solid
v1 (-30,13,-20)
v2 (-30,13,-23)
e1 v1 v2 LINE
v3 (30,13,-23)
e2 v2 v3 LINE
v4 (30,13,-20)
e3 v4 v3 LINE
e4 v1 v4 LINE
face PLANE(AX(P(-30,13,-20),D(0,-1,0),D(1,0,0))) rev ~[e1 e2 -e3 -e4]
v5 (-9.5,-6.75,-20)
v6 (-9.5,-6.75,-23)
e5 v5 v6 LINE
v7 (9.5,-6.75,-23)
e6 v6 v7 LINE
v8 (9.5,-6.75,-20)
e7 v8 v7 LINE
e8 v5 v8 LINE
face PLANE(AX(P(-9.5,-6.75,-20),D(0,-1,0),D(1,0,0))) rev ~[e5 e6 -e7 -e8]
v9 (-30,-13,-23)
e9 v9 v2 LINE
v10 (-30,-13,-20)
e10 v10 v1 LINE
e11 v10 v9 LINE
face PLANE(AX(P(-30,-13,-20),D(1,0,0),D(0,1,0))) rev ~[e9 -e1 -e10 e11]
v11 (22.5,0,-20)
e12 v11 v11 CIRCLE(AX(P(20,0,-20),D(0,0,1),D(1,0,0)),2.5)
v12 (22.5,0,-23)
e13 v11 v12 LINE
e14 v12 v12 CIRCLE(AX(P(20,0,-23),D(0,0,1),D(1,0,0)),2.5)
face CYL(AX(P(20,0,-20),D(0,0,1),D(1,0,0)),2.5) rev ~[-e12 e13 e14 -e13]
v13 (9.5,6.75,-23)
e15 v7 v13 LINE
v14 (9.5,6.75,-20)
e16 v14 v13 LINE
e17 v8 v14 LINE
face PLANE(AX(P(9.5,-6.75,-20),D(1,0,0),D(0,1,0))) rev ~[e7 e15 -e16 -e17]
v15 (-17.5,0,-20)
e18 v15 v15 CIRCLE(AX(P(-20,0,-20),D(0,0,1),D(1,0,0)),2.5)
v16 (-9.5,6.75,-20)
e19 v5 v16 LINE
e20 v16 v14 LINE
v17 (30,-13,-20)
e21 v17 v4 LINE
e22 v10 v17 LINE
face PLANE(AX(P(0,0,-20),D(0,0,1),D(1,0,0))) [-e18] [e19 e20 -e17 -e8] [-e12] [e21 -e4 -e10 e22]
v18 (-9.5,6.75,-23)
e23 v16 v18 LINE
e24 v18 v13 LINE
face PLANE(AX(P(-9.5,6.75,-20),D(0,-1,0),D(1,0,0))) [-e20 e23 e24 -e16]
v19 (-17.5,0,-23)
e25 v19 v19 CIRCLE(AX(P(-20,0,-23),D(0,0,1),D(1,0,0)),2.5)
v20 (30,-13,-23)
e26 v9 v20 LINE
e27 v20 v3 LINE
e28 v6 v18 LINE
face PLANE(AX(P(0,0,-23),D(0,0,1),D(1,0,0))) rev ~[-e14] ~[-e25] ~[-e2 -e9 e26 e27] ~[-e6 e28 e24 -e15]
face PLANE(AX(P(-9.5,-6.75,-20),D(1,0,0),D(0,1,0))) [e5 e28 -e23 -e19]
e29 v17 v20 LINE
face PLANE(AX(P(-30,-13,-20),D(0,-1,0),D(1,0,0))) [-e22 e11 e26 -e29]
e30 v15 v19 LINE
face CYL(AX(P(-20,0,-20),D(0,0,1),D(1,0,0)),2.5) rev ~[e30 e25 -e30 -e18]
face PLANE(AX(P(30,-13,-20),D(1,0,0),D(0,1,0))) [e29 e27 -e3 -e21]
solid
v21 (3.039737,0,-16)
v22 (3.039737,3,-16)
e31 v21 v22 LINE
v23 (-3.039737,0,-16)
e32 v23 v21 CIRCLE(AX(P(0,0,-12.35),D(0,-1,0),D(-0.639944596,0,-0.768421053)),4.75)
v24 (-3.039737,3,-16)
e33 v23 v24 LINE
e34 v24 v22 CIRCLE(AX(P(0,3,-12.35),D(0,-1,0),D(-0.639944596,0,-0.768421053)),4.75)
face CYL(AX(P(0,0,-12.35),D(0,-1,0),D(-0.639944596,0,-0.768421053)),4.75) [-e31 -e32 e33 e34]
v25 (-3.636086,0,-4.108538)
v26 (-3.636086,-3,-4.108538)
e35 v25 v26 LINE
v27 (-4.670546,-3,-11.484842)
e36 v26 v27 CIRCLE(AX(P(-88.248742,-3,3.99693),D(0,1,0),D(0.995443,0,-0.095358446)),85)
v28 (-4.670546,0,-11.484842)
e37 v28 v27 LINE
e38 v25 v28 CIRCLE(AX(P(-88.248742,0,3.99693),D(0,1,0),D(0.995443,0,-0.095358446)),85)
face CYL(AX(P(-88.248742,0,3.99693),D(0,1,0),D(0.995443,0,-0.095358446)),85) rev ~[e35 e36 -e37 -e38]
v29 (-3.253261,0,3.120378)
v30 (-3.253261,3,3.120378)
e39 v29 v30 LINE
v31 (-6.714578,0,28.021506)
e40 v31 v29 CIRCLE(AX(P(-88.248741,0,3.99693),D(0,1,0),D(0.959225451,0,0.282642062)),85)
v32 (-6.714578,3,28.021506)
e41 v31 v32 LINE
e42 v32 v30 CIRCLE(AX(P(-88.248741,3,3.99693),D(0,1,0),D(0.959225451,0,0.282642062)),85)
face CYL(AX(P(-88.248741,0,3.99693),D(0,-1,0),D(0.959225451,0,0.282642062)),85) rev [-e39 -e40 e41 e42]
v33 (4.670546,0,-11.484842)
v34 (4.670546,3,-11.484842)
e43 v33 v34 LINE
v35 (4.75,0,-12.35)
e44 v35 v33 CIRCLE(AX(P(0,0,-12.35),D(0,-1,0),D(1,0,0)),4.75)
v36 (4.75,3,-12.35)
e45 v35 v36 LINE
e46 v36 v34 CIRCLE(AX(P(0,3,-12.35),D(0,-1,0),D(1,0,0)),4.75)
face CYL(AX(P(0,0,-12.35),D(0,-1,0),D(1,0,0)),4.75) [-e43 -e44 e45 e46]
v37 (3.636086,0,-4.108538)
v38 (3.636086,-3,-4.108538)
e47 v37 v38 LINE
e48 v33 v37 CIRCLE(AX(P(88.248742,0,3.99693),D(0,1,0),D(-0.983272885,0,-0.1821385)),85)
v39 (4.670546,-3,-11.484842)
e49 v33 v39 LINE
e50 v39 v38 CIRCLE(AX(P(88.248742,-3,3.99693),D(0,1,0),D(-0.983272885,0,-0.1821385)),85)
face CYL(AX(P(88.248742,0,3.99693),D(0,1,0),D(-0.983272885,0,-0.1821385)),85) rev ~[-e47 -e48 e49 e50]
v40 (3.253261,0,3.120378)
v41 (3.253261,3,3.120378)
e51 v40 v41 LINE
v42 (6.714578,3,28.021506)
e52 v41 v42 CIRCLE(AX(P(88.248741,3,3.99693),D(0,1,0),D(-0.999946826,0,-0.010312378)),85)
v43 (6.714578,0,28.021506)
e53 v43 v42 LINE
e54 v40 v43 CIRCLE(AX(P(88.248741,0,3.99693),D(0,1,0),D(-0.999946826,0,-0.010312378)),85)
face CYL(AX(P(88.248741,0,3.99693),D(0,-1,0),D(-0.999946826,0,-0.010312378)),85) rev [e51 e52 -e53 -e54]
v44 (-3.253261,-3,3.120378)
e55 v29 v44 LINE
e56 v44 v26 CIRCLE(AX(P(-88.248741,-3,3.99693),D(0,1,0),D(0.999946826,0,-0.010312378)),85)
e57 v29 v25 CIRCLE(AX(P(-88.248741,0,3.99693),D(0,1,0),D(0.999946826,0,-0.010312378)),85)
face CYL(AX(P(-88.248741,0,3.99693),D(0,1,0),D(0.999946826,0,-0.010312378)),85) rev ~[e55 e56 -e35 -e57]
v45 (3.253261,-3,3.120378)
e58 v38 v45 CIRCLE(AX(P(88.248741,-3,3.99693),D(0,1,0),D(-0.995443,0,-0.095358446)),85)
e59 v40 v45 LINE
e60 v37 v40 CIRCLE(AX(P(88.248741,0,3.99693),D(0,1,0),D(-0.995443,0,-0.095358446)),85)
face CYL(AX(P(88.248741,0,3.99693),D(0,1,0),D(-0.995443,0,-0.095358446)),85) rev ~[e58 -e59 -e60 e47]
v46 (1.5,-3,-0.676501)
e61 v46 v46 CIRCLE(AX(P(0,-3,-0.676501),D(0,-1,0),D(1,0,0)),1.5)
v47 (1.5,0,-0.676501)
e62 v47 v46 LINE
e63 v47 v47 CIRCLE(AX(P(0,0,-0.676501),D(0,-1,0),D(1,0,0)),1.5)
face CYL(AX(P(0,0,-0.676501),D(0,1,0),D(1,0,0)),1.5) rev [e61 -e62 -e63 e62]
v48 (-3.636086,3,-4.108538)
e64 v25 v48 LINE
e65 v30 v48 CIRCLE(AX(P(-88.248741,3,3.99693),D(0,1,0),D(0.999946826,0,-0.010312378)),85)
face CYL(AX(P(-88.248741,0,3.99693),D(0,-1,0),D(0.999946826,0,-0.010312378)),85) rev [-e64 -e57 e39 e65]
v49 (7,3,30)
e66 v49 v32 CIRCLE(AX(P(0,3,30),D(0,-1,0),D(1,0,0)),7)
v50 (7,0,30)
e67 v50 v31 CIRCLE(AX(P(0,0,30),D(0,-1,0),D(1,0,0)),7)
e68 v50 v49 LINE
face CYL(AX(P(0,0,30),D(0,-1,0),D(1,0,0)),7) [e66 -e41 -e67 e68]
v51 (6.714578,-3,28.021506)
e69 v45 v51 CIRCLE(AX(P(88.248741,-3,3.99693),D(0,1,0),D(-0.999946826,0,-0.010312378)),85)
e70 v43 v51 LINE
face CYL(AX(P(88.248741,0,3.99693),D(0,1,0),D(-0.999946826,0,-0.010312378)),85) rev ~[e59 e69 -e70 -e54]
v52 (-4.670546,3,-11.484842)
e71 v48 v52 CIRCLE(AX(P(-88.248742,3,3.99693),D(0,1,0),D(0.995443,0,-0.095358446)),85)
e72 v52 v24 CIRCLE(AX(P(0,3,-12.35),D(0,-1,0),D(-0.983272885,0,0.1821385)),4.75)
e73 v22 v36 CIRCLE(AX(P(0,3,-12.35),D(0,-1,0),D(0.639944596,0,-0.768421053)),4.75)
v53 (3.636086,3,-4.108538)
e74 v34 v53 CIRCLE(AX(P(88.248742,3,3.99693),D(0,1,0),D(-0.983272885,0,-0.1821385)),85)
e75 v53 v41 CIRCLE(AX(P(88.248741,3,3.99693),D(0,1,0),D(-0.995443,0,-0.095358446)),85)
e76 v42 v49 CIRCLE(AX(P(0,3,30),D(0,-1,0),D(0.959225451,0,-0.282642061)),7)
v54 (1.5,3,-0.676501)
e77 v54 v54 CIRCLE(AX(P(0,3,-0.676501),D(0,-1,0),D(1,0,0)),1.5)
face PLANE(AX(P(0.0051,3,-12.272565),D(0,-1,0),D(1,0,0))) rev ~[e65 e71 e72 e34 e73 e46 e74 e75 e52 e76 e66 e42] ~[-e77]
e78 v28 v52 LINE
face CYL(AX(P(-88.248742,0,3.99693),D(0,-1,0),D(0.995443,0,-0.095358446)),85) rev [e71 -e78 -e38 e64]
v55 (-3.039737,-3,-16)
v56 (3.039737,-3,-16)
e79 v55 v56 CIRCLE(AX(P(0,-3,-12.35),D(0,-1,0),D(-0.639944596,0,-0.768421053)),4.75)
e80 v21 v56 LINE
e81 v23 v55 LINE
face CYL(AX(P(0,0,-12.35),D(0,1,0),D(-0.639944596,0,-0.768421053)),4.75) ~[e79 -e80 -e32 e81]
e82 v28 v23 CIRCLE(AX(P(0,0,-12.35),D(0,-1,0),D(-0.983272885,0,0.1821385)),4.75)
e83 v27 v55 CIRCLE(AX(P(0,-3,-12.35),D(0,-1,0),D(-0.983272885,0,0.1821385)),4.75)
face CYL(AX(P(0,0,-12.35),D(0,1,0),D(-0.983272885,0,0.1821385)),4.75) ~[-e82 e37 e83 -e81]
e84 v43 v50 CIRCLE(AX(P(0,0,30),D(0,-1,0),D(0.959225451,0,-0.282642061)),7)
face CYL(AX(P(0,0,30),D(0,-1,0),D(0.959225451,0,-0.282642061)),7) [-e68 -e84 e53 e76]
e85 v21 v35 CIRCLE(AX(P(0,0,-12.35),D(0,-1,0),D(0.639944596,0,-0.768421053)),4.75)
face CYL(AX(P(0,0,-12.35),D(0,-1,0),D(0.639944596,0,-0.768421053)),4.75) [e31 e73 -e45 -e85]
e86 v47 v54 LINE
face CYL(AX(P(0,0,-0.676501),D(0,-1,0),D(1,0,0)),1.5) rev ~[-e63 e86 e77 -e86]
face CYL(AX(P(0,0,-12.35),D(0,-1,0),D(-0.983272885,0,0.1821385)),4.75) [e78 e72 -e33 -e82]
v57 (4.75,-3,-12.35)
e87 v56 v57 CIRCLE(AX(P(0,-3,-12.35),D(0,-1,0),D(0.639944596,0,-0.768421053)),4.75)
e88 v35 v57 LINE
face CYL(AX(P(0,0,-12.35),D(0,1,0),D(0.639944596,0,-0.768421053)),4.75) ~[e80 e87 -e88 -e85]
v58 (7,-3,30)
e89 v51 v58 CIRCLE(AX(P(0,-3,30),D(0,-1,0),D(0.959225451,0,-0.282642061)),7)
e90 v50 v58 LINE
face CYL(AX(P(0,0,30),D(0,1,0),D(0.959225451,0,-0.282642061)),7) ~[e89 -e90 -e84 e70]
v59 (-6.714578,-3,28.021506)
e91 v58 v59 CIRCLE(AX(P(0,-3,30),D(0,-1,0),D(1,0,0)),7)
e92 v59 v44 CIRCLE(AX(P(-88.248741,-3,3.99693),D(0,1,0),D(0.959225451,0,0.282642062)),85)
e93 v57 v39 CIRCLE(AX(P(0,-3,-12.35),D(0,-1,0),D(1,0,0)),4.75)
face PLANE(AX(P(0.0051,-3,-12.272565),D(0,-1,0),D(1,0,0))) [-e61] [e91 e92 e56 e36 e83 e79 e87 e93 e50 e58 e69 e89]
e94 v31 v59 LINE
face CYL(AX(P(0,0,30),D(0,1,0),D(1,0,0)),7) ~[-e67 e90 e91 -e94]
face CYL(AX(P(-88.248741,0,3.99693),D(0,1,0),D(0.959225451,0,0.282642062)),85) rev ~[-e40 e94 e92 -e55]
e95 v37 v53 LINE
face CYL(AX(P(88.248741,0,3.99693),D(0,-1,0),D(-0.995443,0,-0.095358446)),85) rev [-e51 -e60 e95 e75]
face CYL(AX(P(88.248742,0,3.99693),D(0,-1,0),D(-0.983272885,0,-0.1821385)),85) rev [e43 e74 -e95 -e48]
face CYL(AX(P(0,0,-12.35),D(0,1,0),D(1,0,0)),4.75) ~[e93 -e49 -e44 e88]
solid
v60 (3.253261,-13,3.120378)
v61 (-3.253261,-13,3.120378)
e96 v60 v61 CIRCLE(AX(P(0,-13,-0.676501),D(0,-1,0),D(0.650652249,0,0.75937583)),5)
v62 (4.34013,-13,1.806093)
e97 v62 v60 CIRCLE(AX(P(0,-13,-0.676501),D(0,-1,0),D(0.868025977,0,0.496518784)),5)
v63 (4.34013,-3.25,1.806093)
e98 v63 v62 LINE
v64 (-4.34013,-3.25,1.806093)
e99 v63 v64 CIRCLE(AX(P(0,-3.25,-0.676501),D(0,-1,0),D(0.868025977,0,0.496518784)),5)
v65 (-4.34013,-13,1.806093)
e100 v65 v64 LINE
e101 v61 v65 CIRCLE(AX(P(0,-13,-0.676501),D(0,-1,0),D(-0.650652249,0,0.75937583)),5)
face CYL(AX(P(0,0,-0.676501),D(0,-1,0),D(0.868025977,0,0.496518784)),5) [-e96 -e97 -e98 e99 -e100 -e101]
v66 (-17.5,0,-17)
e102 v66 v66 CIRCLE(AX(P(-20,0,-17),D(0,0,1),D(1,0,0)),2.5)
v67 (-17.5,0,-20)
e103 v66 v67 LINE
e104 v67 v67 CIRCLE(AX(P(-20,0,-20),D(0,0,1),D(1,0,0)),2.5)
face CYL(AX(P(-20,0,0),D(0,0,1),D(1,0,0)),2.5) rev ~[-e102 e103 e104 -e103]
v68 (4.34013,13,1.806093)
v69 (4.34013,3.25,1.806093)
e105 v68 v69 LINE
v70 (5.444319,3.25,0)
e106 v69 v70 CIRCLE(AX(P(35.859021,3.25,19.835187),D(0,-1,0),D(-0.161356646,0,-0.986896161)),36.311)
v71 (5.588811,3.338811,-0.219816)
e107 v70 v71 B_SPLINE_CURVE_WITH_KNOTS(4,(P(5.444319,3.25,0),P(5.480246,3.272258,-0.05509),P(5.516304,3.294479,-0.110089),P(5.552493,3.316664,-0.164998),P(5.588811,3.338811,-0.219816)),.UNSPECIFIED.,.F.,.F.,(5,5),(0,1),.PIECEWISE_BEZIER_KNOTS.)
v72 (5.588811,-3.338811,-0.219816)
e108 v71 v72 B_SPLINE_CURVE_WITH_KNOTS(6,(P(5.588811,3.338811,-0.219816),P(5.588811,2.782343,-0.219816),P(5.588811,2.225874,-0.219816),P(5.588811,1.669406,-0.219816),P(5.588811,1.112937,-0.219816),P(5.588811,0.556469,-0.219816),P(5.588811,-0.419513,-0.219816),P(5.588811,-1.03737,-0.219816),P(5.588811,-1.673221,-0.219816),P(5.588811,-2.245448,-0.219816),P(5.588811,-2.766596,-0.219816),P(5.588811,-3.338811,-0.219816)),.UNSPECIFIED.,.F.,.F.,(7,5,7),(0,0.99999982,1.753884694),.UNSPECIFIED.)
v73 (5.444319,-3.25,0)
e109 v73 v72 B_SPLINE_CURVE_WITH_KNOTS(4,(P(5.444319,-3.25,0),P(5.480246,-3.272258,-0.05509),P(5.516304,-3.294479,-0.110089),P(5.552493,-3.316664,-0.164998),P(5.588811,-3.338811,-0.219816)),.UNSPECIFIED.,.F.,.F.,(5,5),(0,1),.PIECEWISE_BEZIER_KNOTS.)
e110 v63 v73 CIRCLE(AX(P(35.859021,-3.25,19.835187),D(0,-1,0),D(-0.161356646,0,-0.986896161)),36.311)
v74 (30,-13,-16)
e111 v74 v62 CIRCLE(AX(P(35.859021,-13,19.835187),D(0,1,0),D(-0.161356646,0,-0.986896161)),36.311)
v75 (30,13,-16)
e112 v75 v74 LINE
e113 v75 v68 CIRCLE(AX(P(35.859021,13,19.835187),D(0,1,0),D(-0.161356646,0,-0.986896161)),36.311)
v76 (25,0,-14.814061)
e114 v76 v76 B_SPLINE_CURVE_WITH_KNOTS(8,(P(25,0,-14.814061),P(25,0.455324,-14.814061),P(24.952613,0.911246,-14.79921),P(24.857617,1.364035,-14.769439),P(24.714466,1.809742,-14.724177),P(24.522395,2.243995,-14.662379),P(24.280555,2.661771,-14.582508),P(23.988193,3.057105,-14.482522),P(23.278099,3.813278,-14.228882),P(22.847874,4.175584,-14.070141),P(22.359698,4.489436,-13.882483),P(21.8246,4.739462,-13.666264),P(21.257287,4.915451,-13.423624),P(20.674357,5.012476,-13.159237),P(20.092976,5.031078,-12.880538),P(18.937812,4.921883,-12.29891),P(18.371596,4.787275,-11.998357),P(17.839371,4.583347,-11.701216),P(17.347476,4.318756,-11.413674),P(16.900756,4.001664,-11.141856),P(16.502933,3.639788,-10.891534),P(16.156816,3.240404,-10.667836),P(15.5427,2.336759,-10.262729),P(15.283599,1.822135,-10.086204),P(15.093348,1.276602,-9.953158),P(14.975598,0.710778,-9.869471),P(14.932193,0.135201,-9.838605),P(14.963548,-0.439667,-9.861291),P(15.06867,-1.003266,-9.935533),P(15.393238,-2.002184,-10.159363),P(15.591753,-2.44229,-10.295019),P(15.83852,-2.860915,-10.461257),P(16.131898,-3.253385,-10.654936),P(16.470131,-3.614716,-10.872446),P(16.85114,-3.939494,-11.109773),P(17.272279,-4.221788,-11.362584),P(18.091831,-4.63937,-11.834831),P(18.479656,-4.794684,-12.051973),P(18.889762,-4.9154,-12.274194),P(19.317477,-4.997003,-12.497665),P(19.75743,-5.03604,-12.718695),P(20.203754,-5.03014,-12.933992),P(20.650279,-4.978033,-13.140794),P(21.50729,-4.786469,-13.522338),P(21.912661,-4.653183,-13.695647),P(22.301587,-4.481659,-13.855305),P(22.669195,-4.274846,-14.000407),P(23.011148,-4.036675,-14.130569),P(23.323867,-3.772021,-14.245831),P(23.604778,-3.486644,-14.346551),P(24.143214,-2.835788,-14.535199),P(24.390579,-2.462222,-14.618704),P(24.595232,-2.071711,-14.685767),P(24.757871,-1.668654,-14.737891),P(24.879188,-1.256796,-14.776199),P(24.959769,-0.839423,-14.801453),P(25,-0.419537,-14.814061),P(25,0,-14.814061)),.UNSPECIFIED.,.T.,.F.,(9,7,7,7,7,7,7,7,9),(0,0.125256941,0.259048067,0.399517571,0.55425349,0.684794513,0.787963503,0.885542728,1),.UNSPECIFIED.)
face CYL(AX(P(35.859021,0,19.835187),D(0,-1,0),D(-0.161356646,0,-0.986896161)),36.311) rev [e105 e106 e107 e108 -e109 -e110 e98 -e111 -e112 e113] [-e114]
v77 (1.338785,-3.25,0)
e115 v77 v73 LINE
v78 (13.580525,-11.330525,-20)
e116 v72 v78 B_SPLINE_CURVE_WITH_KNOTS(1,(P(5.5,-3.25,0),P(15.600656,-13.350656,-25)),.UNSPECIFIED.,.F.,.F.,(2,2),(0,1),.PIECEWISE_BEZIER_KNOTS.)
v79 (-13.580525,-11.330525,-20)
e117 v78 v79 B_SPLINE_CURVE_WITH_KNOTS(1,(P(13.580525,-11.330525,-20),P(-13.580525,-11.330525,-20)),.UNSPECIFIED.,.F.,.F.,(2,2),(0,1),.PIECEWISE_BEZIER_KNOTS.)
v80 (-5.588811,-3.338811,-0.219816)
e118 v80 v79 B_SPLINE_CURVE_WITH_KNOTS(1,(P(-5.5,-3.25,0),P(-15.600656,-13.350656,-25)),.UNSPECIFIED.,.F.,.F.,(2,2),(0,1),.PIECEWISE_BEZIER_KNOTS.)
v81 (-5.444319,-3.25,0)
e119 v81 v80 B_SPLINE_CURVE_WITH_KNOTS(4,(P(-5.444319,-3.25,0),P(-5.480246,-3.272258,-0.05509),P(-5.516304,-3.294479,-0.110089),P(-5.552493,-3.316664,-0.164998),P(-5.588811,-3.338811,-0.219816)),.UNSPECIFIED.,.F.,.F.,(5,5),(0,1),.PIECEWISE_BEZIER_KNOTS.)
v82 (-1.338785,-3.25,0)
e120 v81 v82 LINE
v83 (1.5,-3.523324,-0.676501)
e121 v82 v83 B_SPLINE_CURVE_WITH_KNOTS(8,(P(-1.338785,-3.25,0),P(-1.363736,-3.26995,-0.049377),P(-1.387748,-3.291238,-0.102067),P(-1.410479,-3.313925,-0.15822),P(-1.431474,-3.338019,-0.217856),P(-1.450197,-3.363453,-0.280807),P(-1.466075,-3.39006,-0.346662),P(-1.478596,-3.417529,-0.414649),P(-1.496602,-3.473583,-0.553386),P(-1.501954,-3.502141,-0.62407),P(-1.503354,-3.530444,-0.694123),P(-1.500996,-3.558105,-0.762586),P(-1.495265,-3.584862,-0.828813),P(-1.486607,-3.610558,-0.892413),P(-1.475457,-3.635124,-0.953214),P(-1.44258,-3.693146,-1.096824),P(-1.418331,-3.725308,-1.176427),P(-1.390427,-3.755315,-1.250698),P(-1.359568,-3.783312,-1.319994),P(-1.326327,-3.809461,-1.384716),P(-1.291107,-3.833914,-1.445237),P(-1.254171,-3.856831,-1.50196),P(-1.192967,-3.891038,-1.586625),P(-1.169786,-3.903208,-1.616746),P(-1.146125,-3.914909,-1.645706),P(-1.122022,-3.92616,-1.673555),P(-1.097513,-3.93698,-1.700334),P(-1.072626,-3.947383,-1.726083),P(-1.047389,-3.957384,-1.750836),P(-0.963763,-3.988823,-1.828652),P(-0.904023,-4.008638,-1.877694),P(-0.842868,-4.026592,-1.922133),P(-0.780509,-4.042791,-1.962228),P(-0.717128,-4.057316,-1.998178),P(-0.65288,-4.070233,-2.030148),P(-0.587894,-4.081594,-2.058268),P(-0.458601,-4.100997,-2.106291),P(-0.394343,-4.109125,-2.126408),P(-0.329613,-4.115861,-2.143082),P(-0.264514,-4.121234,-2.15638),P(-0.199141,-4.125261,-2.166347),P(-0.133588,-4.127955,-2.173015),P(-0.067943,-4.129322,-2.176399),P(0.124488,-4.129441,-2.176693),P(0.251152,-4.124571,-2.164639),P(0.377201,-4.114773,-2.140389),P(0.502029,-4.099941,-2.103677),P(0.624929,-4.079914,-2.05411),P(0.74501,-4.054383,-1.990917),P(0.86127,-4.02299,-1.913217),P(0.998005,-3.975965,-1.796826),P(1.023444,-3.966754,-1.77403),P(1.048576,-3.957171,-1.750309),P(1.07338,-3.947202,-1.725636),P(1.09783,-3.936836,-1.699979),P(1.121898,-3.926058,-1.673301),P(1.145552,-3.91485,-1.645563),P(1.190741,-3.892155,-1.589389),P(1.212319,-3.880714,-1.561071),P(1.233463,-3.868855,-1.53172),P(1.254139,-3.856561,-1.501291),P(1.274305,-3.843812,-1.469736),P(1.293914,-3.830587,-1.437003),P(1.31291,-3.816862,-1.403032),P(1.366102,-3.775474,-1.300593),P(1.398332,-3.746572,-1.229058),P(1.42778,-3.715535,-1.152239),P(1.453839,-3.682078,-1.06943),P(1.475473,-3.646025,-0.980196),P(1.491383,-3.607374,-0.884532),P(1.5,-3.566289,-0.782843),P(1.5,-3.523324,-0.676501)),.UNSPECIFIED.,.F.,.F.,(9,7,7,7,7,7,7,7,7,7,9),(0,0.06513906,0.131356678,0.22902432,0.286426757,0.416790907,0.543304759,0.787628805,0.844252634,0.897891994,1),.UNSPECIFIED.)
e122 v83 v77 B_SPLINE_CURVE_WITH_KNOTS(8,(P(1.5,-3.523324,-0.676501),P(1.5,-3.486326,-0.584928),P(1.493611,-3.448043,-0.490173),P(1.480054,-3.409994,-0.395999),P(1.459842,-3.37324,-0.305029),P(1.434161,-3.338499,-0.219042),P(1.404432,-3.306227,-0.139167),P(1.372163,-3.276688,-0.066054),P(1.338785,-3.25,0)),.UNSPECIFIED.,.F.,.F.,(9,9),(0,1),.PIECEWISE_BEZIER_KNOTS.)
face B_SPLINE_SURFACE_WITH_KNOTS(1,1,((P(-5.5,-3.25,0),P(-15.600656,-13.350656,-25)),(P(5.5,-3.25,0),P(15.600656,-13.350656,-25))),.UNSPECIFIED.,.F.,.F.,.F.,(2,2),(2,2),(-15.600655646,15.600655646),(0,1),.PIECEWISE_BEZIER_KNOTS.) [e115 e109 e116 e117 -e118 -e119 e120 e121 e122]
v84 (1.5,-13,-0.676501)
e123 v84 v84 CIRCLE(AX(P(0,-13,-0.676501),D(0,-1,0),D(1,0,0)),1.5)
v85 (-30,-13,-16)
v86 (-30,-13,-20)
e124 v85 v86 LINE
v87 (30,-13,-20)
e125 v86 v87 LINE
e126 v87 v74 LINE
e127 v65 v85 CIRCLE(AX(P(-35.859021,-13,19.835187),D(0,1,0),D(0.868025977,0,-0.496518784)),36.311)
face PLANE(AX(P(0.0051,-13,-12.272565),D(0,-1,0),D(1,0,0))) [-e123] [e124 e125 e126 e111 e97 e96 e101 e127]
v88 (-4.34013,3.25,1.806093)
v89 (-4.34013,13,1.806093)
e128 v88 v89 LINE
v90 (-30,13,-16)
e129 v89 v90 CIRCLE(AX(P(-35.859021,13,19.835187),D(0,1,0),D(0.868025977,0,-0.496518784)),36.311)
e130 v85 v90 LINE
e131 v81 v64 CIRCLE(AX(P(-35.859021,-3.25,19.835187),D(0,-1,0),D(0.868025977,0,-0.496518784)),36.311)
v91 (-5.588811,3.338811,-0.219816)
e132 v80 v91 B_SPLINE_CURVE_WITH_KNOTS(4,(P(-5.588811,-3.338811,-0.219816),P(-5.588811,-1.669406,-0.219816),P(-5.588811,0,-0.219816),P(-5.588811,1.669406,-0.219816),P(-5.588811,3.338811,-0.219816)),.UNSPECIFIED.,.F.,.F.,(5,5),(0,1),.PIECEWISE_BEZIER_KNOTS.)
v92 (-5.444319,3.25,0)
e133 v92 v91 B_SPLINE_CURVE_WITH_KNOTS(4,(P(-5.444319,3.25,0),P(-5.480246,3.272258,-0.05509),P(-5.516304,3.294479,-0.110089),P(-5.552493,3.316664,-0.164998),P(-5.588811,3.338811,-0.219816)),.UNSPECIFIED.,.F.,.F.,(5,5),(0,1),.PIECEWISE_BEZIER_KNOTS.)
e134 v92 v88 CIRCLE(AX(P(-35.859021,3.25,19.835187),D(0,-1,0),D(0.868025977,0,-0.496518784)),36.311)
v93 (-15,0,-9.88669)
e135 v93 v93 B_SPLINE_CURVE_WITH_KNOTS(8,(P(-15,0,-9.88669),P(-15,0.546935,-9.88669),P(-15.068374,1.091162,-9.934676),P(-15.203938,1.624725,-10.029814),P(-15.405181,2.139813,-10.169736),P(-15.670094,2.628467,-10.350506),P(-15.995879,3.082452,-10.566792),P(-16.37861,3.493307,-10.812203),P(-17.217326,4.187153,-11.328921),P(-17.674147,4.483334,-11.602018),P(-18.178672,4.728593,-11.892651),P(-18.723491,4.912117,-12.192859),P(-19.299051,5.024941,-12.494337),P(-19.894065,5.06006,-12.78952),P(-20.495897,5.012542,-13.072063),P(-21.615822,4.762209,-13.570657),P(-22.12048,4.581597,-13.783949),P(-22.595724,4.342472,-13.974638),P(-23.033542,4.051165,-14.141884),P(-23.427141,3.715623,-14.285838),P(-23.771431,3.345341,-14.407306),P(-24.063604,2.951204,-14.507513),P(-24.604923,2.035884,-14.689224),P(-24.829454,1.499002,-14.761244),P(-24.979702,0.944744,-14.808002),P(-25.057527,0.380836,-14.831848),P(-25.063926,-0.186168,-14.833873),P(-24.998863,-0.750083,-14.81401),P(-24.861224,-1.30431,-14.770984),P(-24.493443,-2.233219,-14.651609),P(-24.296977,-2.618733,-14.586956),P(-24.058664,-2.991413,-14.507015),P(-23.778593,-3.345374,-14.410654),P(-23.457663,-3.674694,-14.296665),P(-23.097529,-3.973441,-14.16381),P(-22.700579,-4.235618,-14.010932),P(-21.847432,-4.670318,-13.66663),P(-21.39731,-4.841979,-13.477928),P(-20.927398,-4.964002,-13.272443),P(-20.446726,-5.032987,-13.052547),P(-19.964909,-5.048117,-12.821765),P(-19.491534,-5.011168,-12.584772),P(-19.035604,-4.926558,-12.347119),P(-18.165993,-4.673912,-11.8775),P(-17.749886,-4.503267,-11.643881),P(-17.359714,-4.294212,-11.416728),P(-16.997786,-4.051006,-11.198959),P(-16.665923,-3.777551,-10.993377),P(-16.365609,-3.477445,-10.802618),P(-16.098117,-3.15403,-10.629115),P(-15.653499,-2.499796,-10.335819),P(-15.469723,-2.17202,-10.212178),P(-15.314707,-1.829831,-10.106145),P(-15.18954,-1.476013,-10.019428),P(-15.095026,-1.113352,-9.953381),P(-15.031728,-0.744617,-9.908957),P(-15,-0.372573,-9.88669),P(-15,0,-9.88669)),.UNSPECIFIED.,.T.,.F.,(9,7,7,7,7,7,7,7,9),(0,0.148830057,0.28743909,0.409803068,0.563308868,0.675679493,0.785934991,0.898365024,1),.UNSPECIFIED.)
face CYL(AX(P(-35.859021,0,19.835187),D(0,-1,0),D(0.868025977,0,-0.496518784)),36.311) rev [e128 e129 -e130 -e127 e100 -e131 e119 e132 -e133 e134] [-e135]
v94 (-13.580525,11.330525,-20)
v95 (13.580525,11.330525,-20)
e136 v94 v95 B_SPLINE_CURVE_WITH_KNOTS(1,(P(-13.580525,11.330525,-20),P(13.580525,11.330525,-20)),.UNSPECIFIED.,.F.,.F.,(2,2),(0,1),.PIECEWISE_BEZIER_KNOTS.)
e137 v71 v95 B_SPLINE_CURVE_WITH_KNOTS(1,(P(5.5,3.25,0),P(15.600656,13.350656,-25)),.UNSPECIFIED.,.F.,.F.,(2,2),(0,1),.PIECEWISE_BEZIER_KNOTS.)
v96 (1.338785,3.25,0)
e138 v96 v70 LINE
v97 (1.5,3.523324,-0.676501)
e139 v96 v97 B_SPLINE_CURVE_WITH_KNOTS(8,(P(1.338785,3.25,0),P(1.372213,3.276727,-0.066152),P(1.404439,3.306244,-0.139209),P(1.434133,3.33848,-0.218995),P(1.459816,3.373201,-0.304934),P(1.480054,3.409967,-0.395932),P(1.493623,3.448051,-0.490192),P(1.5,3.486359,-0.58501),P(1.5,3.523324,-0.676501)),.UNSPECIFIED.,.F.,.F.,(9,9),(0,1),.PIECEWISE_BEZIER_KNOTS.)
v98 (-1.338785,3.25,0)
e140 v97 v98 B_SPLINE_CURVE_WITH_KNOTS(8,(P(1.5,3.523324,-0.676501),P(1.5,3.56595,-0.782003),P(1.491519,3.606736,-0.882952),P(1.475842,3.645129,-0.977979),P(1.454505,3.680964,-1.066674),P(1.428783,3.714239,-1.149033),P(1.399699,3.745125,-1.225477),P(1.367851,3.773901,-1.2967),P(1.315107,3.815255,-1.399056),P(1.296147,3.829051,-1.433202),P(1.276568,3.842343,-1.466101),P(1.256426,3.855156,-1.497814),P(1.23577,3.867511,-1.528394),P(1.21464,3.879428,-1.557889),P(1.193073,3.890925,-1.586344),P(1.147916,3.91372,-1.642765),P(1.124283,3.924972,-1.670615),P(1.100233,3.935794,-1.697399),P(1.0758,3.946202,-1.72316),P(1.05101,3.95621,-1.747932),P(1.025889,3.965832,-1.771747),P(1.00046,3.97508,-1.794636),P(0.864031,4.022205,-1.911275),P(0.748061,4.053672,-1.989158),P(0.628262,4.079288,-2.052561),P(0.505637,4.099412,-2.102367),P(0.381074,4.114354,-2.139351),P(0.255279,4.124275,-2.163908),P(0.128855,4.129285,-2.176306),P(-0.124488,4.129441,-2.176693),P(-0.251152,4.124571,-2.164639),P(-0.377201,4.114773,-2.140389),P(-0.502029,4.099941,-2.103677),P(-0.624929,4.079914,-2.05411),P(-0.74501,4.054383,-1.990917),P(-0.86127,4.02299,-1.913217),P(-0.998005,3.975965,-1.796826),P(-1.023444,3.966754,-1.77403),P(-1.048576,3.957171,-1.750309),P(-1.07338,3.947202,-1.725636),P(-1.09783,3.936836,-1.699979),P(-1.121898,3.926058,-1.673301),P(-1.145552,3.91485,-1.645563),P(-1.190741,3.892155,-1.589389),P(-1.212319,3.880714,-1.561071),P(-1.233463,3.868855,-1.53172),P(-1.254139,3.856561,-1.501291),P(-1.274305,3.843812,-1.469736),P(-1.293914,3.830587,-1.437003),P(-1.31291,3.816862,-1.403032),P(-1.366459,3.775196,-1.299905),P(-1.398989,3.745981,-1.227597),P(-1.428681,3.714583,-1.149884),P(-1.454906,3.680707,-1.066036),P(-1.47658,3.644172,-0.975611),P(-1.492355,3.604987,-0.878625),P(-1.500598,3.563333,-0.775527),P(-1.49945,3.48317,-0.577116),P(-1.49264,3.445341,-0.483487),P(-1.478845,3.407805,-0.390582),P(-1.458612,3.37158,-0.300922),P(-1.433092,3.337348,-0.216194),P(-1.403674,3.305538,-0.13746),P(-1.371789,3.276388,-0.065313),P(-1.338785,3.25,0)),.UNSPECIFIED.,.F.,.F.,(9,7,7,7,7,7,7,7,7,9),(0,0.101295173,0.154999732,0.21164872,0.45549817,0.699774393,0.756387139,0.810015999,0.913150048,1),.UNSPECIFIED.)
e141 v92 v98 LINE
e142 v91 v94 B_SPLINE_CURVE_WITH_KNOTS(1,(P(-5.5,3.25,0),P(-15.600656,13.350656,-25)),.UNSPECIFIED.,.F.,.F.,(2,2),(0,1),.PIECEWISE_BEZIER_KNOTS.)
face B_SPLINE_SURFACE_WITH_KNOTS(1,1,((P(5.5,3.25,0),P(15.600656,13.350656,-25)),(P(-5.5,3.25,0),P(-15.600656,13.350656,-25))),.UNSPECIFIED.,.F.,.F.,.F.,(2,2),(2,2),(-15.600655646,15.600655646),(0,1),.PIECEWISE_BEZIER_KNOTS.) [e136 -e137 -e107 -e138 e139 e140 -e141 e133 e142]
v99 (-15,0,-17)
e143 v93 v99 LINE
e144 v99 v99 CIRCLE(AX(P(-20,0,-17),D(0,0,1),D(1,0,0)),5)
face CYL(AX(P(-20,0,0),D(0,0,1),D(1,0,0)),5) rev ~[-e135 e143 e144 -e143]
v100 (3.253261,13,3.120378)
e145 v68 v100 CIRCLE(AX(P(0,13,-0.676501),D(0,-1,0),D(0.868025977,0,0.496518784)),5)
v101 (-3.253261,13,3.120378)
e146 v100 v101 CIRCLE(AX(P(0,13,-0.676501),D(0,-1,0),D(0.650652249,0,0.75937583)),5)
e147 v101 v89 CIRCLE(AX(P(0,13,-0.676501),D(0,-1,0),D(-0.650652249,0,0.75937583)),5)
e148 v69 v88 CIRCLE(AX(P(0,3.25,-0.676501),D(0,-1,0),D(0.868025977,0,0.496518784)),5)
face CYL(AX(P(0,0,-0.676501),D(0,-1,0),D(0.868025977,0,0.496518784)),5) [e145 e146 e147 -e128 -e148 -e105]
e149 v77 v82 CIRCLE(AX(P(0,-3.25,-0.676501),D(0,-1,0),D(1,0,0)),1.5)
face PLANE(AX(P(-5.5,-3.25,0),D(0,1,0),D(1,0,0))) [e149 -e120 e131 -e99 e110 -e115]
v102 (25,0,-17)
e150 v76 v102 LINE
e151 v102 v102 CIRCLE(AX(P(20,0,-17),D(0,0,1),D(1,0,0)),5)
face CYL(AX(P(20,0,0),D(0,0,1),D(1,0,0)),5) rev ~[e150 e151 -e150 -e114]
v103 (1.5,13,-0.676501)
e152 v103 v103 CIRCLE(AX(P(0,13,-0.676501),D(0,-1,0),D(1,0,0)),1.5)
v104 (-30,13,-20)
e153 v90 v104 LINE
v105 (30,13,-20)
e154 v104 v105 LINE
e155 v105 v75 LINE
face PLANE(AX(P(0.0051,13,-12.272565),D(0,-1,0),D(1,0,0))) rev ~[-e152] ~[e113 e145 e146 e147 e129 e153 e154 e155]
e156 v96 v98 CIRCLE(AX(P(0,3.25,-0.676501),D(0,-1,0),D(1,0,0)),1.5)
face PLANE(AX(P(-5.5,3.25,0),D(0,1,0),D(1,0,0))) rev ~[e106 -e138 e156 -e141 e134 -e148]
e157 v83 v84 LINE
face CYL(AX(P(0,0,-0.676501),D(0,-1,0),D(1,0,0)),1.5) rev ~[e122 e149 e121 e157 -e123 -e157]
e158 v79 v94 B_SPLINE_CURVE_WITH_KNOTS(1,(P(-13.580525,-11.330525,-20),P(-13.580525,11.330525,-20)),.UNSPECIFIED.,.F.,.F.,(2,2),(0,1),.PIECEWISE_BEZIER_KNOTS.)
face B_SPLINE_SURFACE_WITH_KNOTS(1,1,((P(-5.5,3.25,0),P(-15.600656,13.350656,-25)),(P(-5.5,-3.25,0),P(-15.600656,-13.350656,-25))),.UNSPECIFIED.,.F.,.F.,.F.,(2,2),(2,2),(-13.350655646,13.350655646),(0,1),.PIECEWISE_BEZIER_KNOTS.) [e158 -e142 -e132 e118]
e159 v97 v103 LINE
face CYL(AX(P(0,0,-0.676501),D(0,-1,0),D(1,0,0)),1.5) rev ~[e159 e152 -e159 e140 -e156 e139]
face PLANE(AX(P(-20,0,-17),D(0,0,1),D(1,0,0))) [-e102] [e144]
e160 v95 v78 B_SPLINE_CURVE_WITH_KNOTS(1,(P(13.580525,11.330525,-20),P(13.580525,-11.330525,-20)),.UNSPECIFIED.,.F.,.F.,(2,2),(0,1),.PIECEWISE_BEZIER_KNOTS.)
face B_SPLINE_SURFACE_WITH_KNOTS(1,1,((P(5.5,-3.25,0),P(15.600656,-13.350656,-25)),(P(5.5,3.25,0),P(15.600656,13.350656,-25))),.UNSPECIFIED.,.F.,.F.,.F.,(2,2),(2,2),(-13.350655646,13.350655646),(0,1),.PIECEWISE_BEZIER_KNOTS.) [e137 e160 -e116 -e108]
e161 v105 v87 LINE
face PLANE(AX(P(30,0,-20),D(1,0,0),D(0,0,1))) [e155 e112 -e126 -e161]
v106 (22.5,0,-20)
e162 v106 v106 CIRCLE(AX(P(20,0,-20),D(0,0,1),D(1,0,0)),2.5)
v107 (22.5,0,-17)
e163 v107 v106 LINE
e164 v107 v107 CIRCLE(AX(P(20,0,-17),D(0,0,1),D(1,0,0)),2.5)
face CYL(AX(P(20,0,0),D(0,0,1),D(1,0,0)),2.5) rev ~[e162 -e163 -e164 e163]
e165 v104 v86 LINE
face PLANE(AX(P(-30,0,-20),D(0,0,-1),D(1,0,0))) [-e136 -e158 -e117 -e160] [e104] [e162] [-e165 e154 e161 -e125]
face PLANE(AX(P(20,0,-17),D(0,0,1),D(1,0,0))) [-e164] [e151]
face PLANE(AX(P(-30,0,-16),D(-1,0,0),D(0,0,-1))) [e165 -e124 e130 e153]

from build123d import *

# Parameters (mm, degrees)
F0_R          = 1.5
F1_DEPTH      = 3
F1_DEPTH_BACK = 3
F2_DEPTH      = 13
F2_DEPTH_BACK = 13
F3_W          = 11
F3_H          = 6.5
F4_DEPTH      = 25
F4_TAPER      = -22
F4_DEPTH_BACK = 25
F5_START      = -20
F3_W_2        = 60
F3_H_2        = 26
F3_R          = 5
F3_W_3        = 19
F3_H_3        = 13.5
F3_R_2        = 2.5
F5_DEPTH      = 3
F6_DEPTH      = 25
F7_DEPTH      = 17


# Not quite as in the source:
# - a feature names something its author has since deleted; it is built from what else it names


with BuildPart() as f1:
    # F0 (on Front) → F1 (new body, two sides)
    with BuildSketch(Plane.XZ) as f1_sk:
        with BuildLine():
            ThreePointArc((3.0397368307, -16), (4.3012352845, -14.3654093944), (4.75, -12.35))
            ThreePointArc((4.75, -12.35), (4.7300948444, -11.9156006874), (4.6705462051, -11.4848421267))
            ThreePointArc((4.6705462051, -11.4848421267), (0, -7.6), (-4.6705462051, -11.4848421267))
            ThreePointArc((-4.6705462051, -11.4848421267), (-4.4675249052, -13.9636050389), (-3.0397368307, -16))
            Line((-3.0397368307, -16), (3.0397368307, -16))
        make_face()
        with BuildLine():
            ThreePointArc((-4.6705462051, -11.4848421267), (0, -7.6), (4.6705462051, -11.4848421267))
            ThreePointArc((4.6705462051, -11.4848421267), (4.0724799807, -7.8080264222), (3.6360864347, -4.1085375916))
            ThreePointArc((3.6360864347, -4.1085375916), (0, -5.6765009603), (-3.6360864347, -4.1085375916))
            ThreePointArc((-3.6360864347, -4.1085375916), (-4.0724799807, -7.8080264222), (-4.6705462051, -11.4848421267))
        make_face()
        with BuildLine():
            ThreePointArc((-3.0397368307, -16), (0, -17.1), (3.0397368307, -16))
            Line((3.0397368307, -16), (-3.0397368307, -16))
        make_face()
        with BuildLine():
            ThreePointArc((-3.6360864347, -4.1085375916), (0, -5.6765009603), (3.6360864347, -4.1085375916))
            ThreePointArc((3.6360864347, -4.1085375916), (3.3676823781, -0.498156975), (3.2532612438, 3.1203781897))
            ThreePointArc((3.2532612438, 3.1203781897), (0, 4.3234990397), (-3.2532612438, 3.1203781897))
            ThreePointArc((-3.2532612438, 3.1203781897), (-3.3676823781, -0.498156975), (-3.6360864347, -4.1085375916))
        make_face()
        with Locations((0, -0.6765009603)):
            Circle(F0_R, mode=Mode.SUBTRACT)
        with BuildLine():
            ThreePointArc((-3.2532612438, 3.1203781897), (0, 4.3234990397), (3.2532612438, 3.1203781897))
            ThreePointArc((3.2532612438, 3.1203781897), (4.0582011416, 15.6996189973), (6.7145781542, 28.0215055695))
            ThreePointArc((6.7145781542, 28.0215055695), (0, 23), (-6.7145781542, 28.0215055695))
            ThreePointArc((-6.7145781542, 28.0215055695), (-4.0582011416, 15.6996189973), (-3.2532612438, 3.1203781897))
        make_face()
        with BuildLine():
            ThreePointArc((-6.7145781542, 28.0215055695), (0, 23), (6.7145781542, 28.0215055695))
            ThreePointArc((6.7145781542, 28.0215055695), (6.9282770975, 29.0005119008), (7, 30))
            ThreePointArc((7, 30), (-0.9994880992, 36.9282770975), (-6.7145781542, 28.0215055695))
        make_face()
    extrude(amount=F1_DEPTH)
    extrude(f1_sk.sketch, amount=-F1_DEPTH_BACK)


with BuildPart() as f2:
    # F0 (on Front) → F2 (new body, two sides)
    with BuildSketch(Plane.XZ) as f2_sk:
        with BuildLine():
            ThreePointArc((3.0397368307, -16), (4.3012352845, -14.3654093944), (4.75, -12.35))
            ThreePointArc((4.75, -12.35), (4.7300948444, -11.9156006874), (4.6705462051, -11.4848421267))
            ThreePointArc((4.6705462051, -11.4848421267), (0, -7.6), (-4.6705462051, -11.4848421267))
            ThreePointArc((-4.6705462051, -11.4848421267), (-4.4675249052, -13.9636050389), (-3.0397368307, -16))
            Line((-3.0397368307, -16), (3.0397368307, -16))
        make_face()
        with BuildLine():
            ThreePointArc((4.6705462051, -11.4848421267), (4.7300948444, -11.9156006874), (4.75, -12.35))
            ThreePointArc((4.75, -12.35), (4.3012352845, -14.3654093944), (3.0397368307, -16))
            Line((3.0397368307, -16), (30, -16))
            ThreePointArc((30, -16), (15.1577815574, -9.9967996829), (4.3401298873, 1.8060929577))
            ThreePointArc((4.3401298873, 1.8060929577), (4.8322173708, 0.607895895), (5, -0.6765009603))
            ThreePointArc((5, -0.6765009603), (4.6465273148, -2.5230609818), (3.6360864347, -4.1085375916))
            ThreePointArc((3.6360864347, -4.1085375916), (4.0724799807, -7.8080264222), (4.6705462051, -11.4848421267))
        make_face()
        with BuildLine():
            ThreePointArc((-4.6705462051, -11.4848421267), (0, -7.6), (4.6705462051, -11.4848421267))
            ThreePointArc((4.6705462051, -11.4848421267), (4.0724799807, -7.8080264222), (3.6360864347, -4.1085375916))
            ThreePointArc((3.6360864347, -4.1085375916), (0, -5.6765009603), (-3.6360864347, -4.1085375916))
            ThreePointArc((-3.6360864347, -4.1085375916), (-4.0724799807, -7.8080264222), (-4.6705462051, -11.4848421267))
        make_face()
        with BuildLine():
            Line((30, -16), (3.0397368307, -16))
            ThreePointArc((3.0397368307, -16), (0, -17.1), (-3.0397368307, -16))
            Line((-3.0397368307, -16), (-30, -16))
            Line((-30, -16), (-30, -20))
            Line((-30, -20), (30, -20))
            Line((30, -20), (30, -16))
        make_face()
        with BuildLine():
            ThreePointArc((-3.0397368307, -16), (0, -17.1), (3.0397368307, -16))
            Line((3.0397368307, -16), (-3.0397368307, -16))
        make_face()
        with BuildLine():
            ThreePointArc((-3.0397368307, -16), (-4.4675249052, -13.9636050389), (-4.6705462051, -11.4848421267))
            ThreePointArc((-4.6705462051, -11.4848421267), (-4.0724799807, -7.8080264222), (-3.6360864347, -4.1085375916))
            ThreePointArc((-3.6360864347, -4.1085375916), (-4.9649491778, -1.2674998285), (-4.3401298873, 1.8060929577))
            ThreePointArc((-4.3401298873, 1.8060929577), (-15.1577815574, -9.9967996829), (-30, -16))
            Line((-30, -16), (-3.0397368307, -16))
        make_face()
        with BuildLine():
            ThreePointArc((-3.6360864347, -4.1085375916), (0, -5.6765009603), (3.6360864347, -4.1085375916))
            ThreePointArc((3.6360864347, -4.1085375916), (3.3676823781, -0.498156975), (3.2532612438, 3.1203781897))
            ThreePointArc((3.2532612438, 3.1203781897), (0, 4.3234990397), (-3.2532612438, 3.1203781897))
            ThreePointArc((-3.2532612438, 3.1203781897), (-3.3676823781, -0.498156975), (-3.6360864347, -4.1085375916))
        make_face()
        with Locations((0, -0.6765009603)):
            Circle(F0_R, mode=Mode.SUBTRACT)
        with BuildLine():
            ThreePointArc((3.2532612438, 3.1203781897), (3.3676823781, -0.498156975), (3.6360864347, -4.1085375916))
            ThreePointArc((3.6360864347, -4.1085375916), (4.6465273148, -2.5230609818), (5, -0.6765009603))
            ThreePointArc((5, -0.6765009603), (4.8322173708, 0.607895895), (4.3401298873, 1.8060929577))
            ThreePointArc((4.3401298873, 1.8060929577), (3.85314594, 2.5099180902), (3.2532612438, 3.1203781897))
        make_face()
        with BuildLine():
            ThreePointArc((-4.3401298873, 1.8060929577), (-4.9649491778, -1.2674998285), (-3.6360864347, -4.1085375916))
            ThreePointArc((-3.6360864347, -4.1085375916), (-3.3676823781, -0.498156975), (-3.2532612438, 3.1203781897))
            ThreePointArc((-3.2532612438, 3.1203781897), (-3.85314594, 2.5099180902), (-4.3401298873, 1.8060929577))
        make_face()
    extrude(amount=F2_DEPTH)
    extrude(f2_sk.sketch, amount=-F2_DEPTH_BACK)

    # F3 (on Top) → F4 (cut, two sides)
    with BuildSketch(Plane.XY) as f4_sk:
        Rectangle(F3_W, F3_H)
    extrude(amount=-F4_DEPTH, taper=F4_TAPER, mode=Mode.SUBTRACT)
    extrude(f4_sk.sketch, amount=F4_DEPTH_BACK, mode=Mode.SUBTRACT)

    # F3 (on Top) → F6 (cut)
    with BuildSketch(Plane.XY):
        with Locations((-20, 0)):
            Circle(F3_R_2)
        with Locations((20, 0)):
            Circle(F3_R_2)
    extrude(amount=-F6_DEPTH, mode=Mode.SUBTRACT)

    # F3 (on Top) → F7 (cut)
    with BuildSketch(Plane.XY):
        with Locations((-20, 0)):
            Circle(F3_R)
        with Locations((-20, 0)):
            Circle(F3_R_2, mode=Mode.SUBTRACT)
        with Locations((20, 0)):
            Circle(F3_R)
        with Locations((20, 0)):
            Circle(F3_R_2, mode=Mode.SUBTRACT)
    extrude(amount=-F7_DEPTH, mode=Mode.SUBTRACT)


with BuildPart() as f5:
    # F3 (on Top) → F5 (new body)
    with BuildSketch(Plane.XY.offset(F5_START)):
        Rectangle(F3_W_2, F3_H_2)
        with Locations((-20, 0)):
            Circle(F3_R, mode=Mode.SUBTRACT)
        Rectangle(F3_W_3, F3_H_3, mode=Mode.SUBTRACT)
        with Locations((20, 0)):
            Circle(F3_R, mode=Mode.SUBTRACT)
        with Locations((20, 0)):
            Circle(F3_R)
        with Locations((20, 0)):
            Circle(F3_R_2, mode=Mode.SUBTRACT)
        with Locations((-20, 0)):
            Circle(F3_R)
        with Locations((-20, 0)):
            Circle(F3_R_2, mode=Mode.SUBTRACT)
    extrude(amount=-F5_DEPTH)


solid = Compound([f1.part, f2.part, f5.part])
